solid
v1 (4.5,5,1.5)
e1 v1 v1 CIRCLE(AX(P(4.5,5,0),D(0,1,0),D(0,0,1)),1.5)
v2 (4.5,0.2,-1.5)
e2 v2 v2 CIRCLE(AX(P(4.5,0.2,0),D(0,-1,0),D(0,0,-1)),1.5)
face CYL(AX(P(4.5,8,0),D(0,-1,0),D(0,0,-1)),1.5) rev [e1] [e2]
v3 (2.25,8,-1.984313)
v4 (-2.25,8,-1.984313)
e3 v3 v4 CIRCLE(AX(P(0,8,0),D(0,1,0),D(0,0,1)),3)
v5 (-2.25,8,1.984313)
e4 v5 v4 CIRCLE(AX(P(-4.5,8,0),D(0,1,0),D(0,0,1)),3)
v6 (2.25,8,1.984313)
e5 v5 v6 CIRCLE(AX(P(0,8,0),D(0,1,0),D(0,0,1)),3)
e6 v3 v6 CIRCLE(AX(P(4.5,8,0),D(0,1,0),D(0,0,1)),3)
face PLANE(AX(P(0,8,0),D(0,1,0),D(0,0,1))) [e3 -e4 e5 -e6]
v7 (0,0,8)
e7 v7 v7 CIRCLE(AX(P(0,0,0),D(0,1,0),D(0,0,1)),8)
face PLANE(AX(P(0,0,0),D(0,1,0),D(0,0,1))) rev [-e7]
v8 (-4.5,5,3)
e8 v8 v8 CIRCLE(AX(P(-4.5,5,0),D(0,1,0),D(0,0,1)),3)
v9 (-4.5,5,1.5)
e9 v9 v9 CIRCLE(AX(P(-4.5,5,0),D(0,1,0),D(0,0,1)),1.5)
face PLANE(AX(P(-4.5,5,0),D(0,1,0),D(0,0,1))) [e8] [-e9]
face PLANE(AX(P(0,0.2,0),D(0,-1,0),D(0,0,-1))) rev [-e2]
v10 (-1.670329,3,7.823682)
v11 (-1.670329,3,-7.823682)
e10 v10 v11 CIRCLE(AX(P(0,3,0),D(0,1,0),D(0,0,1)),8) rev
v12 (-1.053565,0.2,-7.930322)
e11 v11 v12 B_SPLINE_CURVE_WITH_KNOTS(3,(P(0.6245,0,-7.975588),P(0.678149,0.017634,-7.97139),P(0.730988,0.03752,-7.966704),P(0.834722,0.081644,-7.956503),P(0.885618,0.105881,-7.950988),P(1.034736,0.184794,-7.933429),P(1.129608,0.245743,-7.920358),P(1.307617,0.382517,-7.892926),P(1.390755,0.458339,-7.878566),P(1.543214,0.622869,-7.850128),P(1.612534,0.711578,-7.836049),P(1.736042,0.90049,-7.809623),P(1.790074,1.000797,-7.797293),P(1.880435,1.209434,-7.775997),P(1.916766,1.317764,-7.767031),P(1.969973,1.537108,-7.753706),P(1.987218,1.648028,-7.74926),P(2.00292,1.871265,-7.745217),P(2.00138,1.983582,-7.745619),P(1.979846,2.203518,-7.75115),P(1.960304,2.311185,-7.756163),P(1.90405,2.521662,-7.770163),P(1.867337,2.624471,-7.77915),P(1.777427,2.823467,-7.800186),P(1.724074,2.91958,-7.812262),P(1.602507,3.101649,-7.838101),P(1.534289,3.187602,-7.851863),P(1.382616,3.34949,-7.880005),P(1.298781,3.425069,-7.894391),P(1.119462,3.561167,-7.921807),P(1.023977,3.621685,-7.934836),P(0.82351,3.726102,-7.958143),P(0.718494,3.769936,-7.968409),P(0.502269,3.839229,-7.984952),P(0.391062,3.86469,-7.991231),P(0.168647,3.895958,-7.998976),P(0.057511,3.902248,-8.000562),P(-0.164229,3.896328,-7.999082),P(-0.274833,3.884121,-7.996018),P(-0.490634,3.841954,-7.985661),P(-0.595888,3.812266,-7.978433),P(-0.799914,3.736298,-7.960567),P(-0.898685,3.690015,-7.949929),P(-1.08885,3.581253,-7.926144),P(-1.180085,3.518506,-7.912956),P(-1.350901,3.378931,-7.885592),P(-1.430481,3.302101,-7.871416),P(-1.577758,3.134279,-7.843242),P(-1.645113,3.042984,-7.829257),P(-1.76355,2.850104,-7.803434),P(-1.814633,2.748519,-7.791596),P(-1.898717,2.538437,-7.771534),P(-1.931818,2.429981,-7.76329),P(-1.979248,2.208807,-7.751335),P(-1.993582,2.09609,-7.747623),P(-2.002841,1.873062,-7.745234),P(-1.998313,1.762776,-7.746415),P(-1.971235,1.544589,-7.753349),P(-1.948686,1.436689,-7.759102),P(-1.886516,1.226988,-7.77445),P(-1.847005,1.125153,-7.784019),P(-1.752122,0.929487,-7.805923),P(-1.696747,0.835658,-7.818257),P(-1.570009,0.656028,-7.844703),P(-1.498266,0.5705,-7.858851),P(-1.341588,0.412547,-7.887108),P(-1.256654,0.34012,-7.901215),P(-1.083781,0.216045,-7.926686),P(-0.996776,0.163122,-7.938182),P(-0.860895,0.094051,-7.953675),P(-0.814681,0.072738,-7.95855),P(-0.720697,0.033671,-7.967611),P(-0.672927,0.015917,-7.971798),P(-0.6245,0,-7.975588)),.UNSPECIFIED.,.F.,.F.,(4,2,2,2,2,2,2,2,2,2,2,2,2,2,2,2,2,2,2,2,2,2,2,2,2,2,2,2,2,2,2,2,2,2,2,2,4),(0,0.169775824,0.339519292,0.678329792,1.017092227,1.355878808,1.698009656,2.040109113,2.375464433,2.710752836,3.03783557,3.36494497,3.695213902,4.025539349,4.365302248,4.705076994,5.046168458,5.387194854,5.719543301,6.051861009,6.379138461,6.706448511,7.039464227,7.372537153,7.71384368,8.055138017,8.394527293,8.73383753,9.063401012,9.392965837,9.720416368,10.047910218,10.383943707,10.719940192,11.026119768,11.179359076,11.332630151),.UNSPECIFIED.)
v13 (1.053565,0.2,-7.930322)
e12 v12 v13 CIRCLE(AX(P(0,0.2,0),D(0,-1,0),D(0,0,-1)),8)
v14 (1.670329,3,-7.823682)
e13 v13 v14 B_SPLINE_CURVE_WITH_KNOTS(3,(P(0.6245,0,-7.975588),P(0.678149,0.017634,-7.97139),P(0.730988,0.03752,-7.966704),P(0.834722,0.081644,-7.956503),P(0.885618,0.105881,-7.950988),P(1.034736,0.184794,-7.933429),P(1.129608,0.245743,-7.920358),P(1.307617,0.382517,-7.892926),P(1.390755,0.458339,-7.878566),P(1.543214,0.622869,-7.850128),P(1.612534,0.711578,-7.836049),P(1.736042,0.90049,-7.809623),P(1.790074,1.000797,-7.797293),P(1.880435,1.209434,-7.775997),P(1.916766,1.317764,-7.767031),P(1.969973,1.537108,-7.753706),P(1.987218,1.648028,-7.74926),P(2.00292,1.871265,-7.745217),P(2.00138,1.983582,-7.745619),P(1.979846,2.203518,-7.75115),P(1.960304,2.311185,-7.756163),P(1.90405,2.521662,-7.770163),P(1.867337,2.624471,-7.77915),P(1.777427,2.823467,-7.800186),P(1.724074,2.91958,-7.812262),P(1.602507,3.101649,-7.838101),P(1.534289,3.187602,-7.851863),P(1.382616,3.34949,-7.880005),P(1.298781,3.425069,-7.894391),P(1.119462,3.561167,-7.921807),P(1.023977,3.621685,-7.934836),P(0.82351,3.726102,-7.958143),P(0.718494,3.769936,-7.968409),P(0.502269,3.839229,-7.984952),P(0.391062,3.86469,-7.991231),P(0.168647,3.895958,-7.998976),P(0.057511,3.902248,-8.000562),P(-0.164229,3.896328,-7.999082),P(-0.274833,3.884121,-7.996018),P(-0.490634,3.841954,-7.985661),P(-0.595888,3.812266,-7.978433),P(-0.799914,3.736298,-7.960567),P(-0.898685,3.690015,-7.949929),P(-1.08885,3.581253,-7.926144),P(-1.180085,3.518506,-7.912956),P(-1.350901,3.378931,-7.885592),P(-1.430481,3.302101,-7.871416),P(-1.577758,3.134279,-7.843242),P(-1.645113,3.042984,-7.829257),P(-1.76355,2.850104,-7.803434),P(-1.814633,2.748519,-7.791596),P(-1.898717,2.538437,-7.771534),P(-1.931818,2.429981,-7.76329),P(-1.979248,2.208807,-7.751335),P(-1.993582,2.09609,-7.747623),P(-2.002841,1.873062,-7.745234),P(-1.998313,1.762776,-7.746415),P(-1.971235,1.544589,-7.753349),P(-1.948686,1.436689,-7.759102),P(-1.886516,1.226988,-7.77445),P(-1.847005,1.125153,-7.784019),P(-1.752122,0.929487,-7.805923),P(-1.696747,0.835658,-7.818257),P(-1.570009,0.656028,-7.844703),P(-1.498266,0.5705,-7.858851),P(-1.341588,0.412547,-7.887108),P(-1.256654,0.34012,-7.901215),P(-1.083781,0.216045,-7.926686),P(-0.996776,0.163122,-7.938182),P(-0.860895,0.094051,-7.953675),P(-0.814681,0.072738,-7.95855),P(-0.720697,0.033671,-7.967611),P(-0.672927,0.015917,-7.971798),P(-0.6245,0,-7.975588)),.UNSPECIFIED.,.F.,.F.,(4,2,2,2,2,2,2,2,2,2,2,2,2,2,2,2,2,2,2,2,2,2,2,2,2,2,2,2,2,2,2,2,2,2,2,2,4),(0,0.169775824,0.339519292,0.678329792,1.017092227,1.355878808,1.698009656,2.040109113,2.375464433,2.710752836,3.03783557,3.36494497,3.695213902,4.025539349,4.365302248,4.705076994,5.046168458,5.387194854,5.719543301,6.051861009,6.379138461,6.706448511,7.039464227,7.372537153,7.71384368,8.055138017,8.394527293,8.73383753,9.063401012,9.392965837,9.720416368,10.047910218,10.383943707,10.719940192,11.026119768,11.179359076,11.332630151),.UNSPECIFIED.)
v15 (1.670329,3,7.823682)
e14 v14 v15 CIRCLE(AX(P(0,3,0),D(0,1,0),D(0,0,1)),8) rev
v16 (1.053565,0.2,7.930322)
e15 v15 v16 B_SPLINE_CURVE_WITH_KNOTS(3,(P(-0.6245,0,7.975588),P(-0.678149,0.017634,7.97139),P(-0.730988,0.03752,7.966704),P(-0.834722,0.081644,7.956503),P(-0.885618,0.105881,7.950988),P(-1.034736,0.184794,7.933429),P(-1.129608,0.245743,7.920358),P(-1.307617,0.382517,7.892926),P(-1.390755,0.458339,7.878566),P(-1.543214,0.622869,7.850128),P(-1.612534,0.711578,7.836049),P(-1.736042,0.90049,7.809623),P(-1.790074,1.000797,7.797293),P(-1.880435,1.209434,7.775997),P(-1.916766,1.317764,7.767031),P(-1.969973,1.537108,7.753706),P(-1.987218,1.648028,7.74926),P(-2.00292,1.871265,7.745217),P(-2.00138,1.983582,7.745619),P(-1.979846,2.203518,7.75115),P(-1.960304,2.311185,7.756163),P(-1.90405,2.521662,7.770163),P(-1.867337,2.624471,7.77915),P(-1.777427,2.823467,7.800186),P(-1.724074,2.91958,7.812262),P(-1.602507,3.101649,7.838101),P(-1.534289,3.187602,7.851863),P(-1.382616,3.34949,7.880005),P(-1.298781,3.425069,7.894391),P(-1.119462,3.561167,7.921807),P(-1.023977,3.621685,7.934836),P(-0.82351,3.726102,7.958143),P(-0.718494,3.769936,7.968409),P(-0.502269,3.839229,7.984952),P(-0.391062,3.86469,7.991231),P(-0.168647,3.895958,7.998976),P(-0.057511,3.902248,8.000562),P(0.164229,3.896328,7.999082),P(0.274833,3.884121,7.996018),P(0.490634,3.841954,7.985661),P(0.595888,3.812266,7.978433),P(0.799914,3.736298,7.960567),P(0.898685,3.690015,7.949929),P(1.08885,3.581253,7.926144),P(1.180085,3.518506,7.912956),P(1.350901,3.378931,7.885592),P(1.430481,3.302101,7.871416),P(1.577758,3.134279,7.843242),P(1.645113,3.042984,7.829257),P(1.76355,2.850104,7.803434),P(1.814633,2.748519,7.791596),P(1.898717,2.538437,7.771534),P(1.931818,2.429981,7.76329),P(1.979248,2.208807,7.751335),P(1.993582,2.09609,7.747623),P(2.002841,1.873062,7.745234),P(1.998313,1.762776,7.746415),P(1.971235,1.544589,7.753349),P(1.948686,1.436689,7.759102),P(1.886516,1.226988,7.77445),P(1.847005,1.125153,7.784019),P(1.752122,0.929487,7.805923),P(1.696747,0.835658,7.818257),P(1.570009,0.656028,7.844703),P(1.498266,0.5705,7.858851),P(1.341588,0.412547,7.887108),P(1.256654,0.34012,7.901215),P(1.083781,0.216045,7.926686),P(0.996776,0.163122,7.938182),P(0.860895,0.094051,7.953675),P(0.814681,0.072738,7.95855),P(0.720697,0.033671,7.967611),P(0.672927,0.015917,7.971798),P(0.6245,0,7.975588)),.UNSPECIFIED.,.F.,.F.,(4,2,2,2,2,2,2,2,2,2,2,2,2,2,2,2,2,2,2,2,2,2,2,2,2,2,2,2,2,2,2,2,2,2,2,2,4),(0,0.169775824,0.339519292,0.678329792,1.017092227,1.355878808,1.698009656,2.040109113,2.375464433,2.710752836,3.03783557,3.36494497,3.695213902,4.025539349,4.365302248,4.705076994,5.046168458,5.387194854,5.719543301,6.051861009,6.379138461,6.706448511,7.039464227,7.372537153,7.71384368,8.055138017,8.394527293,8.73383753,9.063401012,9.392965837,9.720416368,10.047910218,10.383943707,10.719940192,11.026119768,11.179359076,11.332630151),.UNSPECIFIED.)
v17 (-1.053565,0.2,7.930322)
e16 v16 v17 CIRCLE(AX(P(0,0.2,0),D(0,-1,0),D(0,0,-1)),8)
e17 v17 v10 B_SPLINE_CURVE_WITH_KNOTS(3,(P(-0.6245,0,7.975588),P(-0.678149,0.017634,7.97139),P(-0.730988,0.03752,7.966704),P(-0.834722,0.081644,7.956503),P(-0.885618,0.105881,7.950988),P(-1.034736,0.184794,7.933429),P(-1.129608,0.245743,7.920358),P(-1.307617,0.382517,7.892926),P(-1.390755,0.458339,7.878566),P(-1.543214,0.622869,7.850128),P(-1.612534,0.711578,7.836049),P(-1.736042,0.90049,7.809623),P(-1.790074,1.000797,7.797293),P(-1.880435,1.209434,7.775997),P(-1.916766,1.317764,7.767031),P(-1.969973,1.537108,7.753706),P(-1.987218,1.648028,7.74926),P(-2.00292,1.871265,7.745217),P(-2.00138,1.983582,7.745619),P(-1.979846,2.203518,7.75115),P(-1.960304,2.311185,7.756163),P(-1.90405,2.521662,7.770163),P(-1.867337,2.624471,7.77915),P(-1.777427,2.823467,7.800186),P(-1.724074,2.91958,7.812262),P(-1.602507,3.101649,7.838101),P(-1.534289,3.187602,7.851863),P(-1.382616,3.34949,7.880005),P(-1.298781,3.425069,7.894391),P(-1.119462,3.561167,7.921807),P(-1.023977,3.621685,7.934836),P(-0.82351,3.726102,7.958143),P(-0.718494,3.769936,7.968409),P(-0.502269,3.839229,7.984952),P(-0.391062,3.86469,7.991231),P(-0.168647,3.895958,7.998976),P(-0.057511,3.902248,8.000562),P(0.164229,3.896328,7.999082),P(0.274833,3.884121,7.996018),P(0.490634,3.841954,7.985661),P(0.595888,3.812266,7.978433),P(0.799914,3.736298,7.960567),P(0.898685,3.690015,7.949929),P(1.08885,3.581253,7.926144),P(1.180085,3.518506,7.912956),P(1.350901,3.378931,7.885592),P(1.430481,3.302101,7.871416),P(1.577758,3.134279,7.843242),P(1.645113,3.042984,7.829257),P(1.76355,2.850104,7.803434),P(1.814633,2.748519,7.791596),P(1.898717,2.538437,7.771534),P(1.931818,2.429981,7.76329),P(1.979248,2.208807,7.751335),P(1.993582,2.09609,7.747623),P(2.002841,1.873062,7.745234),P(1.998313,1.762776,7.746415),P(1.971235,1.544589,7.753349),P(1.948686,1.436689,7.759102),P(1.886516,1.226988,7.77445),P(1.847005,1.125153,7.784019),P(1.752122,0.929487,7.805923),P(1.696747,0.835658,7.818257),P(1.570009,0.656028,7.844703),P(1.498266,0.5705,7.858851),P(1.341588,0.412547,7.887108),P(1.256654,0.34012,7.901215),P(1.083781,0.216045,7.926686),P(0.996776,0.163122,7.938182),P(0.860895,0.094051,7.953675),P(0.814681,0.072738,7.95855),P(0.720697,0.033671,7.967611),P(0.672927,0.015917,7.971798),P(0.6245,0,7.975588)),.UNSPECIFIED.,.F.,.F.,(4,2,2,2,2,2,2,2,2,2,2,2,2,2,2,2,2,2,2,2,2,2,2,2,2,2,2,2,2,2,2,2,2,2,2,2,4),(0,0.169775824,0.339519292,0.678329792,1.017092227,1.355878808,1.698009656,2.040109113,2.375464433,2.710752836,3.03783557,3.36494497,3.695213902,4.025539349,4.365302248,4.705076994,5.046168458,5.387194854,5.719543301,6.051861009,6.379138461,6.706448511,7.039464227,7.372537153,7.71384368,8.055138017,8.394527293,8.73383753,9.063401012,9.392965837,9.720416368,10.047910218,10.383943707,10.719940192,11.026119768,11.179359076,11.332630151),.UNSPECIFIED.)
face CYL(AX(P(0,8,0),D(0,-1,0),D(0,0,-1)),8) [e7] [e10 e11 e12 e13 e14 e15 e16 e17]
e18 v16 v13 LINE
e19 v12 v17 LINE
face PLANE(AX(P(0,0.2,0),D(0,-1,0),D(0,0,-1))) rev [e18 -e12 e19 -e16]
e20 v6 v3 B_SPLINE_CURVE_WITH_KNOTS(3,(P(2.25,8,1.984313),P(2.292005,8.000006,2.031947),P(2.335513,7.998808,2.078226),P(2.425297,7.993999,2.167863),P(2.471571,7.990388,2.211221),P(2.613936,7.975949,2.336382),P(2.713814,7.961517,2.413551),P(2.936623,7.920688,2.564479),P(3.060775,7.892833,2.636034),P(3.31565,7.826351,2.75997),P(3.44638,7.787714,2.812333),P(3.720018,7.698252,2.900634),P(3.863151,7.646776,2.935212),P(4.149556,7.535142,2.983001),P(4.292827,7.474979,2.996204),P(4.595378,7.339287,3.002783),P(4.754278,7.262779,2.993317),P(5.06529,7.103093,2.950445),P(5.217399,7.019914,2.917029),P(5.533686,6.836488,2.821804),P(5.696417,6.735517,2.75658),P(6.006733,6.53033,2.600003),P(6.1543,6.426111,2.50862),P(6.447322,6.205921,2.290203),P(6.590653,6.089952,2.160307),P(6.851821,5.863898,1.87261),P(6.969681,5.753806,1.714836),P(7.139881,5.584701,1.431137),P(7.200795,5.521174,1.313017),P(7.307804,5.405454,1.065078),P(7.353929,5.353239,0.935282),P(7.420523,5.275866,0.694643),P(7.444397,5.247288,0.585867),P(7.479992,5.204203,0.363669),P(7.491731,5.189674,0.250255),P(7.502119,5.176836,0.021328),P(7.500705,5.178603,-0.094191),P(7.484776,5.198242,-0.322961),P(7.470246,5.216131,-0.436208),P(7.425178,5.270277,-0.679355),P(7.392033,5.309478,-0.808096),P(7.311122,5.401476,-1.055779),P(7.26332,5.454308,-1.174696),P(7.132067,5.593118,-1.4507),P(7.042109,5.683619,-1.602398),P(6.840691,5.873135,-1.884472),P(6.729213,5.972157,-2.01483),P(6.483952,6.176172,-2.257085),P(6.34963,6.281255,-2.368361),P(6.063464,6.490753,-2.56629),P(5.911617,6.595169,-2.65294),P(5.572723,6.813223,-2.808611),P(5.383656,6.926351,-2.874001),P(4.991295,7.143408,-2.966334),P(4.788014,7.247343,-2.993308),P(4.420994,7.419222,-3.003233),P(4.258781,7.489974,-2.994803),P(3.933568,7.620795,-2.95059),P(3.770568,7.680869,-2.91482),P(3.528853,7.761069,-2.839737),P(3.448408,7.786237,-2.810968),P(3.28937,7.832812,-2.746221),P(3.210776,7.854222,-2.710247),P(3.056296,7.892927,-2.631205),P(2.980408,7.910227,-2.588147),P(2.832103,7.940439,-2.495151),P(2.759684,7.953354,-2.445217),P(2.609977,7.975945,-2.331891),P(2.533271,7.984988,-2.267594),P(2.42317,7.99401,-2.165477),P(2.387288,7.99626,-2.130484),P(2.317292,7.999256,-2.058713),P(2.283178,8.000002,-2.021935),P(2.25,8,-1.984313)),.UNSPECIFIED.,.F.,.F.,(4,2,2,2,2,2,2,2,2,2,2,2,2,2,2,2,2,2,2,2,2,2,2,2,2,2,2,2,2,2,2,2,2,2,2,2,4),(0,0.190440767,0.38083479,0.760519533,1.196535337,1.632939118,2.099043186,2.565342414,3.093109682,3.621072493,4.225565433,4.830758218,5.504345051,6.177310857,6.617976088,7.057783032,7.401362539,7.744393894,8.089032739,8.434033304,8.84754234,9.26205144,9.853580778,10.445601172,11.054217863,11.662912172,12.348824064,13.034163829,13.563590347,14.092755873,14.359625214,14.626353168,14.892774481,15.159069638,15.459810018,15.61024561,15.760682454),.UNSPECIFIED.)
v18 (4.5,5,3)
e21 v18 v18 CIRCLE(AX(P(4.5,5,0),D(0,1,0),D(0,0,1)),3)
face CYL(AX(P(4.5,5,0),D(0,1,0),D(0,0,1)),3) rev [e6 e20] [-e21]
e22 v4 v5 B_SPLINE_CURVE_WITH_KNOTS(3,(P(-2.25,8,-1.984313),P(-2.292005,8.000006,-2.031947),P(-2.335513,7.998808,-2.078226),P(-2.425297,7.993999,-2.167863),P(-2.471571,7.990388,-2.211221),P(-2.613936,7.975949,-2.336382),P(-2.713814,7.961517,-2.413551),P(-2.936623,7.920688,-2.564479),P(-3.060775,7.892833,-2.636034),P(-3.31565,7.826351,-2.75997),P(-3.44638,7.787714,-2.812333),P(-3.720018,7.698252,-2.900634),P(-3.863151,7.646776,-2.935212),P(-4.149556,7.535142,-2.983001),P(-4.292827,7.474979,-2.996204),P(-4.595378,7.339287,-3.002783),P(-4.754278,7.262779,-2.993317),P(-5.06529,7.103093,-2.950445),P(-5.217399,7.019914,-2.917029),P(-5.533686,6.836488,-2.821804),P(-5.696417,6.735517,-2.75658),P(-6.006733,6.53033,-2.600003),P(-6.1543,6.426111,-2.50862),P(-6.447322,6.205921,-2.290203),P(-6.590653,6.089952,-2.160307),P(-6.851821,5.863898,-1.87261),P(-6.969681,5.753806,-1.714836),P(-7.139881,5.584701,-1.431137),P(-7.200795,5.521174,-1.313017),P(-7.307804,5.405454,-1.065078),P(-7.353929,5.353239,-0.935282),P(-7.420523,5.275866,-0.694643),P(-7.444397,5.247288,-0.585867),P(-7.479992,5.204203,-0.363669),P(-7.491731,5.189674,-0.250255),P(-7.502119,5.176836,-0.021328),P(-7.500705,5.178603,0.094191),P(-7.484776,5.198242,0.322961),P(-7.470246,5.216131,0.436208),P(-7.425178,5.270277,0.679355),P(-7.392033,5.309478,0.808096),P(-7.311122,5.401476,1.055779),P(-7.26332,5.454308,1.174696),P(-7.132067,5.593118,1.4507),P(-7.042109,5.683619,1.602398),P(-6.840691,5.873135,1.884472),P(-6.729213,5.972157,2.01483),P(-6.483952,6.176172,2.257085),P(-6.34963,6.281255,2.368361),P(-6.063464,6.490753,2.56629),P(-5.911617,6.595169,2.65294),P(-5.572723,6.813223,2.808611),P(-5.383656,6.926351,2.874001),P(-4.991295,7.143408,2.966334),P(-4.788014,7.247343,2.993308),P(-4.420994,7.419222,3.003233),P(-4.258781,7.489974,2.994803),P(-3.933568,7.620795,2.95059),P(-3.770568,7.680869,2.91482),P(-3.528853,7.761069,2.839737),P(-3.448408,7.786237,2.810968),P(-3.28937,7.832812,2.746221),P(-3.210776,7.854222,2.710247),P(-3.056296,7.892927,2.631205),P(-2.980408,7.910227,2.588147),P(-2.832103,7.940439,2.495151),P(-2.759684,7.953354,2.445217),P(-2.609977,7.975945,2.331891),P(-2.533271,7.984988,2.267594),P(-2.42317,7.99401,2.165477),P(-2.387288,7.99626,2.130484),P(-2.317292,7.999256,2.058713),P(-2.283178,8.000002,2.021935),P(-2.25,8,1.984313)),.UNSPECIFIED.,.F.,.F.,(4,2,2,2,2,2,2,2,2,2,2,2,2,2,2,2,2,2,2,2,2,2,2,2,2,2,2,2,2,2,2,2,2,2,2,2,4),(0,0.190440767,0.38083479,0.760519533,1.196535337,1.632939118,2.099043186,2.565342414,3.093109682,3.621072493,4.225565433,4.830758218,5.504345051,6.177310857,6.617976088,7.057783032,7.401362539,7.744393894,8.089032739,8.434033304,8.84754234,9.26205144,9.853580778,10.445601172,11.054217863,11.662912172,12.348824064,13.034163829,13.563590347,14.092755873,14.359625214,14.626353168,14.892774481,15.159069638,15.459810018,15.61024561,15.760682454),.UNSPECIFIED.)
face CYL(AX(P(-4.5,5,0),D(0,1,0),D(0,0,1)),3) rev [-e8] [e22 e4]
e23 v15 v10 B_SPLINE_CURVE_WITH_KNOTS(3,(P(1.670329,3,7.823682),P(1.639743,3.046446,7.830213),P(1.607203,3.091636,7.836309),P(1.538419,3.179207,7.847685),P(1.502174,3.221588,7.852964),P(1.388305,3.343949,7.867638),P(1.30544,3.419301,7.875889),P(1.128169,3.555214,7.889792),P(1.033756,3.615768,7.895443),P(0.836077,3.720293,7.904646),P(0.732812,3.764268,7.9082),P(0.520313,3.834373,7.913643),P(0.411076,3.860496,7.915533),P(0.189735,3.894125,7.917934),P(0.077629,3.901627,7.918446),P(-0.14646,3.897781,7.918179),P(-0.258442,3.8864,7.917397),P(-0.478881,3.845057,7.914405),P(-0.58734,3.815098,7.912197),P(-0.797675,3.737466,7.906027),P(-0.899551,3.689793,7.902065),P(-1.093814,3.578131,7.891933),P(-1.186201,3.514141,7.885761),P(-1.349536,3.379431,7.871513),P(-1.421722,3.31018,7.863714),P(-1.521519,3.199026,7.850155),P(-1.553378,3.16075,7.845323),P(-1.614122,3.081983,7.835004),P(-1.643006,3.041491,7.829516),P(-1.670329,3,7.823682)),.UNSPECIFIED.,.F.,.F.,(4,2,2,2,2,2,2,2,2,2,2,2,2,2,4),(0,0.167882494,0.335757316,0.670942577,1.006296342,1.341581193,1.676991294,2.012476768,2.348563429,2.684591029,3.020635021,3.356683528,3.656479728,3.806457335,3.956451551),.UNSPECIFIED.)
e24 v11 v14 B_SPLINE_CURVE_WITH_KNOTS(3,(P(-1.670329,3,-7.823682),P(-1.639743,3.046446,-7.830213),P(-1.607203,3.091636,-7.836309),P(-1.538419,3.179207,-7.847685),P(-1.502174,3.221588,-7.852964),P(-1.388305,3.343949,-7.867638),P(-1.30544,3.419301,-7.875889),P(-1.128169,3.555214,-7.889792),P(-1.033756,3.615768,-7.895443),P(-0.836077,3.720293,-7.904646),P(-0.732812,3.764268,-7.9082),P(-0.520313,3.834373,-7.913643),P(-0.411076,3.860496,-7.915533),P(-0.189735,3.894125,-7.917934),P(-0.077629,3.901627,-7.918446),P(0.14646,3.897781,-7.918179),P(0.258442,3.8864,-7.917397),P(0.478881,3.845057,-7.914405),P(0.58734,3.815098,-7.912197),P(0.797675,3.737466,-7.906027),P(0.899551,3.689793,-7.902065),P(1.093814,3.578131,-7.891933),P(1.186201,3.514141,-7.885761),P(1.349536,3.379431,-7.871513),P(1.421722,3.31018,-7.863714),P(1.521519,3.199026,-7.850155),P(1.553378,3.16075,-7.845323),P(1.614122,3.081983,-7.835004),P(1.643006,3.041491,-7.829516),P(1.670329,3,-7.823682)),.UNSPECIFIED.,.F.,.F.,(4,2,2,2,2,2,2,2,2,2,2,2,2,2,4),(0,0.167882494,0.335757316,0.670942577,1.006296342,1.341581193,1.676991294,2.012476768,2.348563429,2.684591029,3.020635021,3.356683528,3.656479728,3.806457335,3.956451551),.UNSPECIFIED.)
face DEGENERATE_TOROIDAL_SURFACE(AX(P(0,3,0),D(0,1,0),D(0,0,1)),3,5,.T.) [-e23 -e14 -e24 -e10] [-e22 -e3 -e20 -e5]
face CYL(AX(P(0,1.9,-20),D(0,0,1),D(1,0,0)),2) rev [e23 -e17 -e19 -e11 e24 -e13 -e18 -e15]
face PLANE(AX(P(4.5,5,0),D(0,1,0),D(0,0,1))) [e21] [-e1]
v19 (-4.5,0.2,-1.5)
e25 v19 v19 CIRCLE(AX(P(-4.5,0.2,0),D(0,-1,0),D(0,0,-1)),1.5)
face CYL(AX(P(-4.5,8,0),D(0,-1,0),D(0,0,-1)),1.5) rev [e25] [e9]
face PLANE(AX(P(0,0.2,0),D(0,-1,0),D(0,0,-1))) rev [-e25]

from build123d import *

# Parameters (mm, degrees)
ESQUISSE1_R             = 8
ESQUISSE1_R_2           = 1.5
BOSS_EXTRU_1_DEPTH      = 8
ESQUISSE2_R             = 3
ENL_V_MAT_EXTRU_1_DEPTH = 3
ESQUISSE3_R             = 2
ENL_V_MAT_EXTRU_2_DEPTH = 20
CONG_1_R                = 5
ESQUISSE4_R             = 8
BOSS_EXTRU_2_DEPTH      = 0.2


with BuildPart() as part:
    # Esquisse1 → Boss.-Extru.1 (new body)
    with BuildSketch(Plane(origin=(0, 0, 0), x_dir=(1, 0, 0), z_dir=(0, 1, 0))):
        with Locations(Location((0, 0, 0), (0, 0, 270))):
            Circle(ESQUISSE1_R)
        with Locations(Location((-4.5, 0, 0), (0, 0, 270))):
            Circle(ESQUISSE1_R_2, mode=Mode.SUBTRACT)
        with Locations(Location((4.5, 0, 0), (0, 0, 90))):
            Circle(ESQUISSE1_R_2, mode=Mode.SUBTRACT)
    extrude(amount=BOSS_EXTRU_1_DEPTH)

    # Esquisse2 → Enlèv. mat.-Extru.1 (cut)
    with BuildSketch(Plane(origin=(0, 8, 0), x_dir=(1, 0, 0), z_dir=(0, 1, 0))):
        with Locations(Location((-4.5, 0, 0), (0, 0, 270))):
            Circle(ESQUISSE2_R)
        with Locations(Location((4.5, 0, 0), (0, 0, 270))):
            Circle(ESQUISSE2_R)
    extrude(amount=-ENL_V_MAT_EXTRU_1_DEPTH, mode=Mode.SUBTRACT)

    # Esquisse3 → Enlèv. mat.-Extru.2 (cut, symmetric)
    with BuildSketch(Plane.XY):
        with Locations((0, 1.9)):
            Circle(ESQUISSE3_R)
    extrude(amount=ENL_V_MAT_EXTRU_2_DEPTH, both=True, mode=Mode.SUBTRACT)

    # Congé1
    # the kernel refuses this fillet: 5 mm, written as the material it takes off along each edge
    with BuildSketch(Plane(origin=(0, 8, 0), x_dir=(0, 0, 1), z_dir=(-1, 0, 0))) as cong_1_piece_1:
        with BuildLine():
            CenterArc((8 - CONG_1_R, -CONG_1_R), CONG_1_R, 0, 90)
            Line((8 - CONG_1_R, 0), (8, 0))
            Line((8, 0), (8, -CONG_1_R))
        make_face()
    revolve(axis=Axis((0, 8, 0), (0, 1, 0)), mode=Mode.SUBTRACT)

    # Esquisse4 → Boss.-Extru.2 (add)
    with BuildSketch(Plane.XZ):
        with Locations(Location((0, 0, 0), (0, 0, 262.432428308))):
            Circle(ESQUISSE4_R)
    extrude(amount=-BOSS_EXTRU_2_DEPTH)


solid = part.part
